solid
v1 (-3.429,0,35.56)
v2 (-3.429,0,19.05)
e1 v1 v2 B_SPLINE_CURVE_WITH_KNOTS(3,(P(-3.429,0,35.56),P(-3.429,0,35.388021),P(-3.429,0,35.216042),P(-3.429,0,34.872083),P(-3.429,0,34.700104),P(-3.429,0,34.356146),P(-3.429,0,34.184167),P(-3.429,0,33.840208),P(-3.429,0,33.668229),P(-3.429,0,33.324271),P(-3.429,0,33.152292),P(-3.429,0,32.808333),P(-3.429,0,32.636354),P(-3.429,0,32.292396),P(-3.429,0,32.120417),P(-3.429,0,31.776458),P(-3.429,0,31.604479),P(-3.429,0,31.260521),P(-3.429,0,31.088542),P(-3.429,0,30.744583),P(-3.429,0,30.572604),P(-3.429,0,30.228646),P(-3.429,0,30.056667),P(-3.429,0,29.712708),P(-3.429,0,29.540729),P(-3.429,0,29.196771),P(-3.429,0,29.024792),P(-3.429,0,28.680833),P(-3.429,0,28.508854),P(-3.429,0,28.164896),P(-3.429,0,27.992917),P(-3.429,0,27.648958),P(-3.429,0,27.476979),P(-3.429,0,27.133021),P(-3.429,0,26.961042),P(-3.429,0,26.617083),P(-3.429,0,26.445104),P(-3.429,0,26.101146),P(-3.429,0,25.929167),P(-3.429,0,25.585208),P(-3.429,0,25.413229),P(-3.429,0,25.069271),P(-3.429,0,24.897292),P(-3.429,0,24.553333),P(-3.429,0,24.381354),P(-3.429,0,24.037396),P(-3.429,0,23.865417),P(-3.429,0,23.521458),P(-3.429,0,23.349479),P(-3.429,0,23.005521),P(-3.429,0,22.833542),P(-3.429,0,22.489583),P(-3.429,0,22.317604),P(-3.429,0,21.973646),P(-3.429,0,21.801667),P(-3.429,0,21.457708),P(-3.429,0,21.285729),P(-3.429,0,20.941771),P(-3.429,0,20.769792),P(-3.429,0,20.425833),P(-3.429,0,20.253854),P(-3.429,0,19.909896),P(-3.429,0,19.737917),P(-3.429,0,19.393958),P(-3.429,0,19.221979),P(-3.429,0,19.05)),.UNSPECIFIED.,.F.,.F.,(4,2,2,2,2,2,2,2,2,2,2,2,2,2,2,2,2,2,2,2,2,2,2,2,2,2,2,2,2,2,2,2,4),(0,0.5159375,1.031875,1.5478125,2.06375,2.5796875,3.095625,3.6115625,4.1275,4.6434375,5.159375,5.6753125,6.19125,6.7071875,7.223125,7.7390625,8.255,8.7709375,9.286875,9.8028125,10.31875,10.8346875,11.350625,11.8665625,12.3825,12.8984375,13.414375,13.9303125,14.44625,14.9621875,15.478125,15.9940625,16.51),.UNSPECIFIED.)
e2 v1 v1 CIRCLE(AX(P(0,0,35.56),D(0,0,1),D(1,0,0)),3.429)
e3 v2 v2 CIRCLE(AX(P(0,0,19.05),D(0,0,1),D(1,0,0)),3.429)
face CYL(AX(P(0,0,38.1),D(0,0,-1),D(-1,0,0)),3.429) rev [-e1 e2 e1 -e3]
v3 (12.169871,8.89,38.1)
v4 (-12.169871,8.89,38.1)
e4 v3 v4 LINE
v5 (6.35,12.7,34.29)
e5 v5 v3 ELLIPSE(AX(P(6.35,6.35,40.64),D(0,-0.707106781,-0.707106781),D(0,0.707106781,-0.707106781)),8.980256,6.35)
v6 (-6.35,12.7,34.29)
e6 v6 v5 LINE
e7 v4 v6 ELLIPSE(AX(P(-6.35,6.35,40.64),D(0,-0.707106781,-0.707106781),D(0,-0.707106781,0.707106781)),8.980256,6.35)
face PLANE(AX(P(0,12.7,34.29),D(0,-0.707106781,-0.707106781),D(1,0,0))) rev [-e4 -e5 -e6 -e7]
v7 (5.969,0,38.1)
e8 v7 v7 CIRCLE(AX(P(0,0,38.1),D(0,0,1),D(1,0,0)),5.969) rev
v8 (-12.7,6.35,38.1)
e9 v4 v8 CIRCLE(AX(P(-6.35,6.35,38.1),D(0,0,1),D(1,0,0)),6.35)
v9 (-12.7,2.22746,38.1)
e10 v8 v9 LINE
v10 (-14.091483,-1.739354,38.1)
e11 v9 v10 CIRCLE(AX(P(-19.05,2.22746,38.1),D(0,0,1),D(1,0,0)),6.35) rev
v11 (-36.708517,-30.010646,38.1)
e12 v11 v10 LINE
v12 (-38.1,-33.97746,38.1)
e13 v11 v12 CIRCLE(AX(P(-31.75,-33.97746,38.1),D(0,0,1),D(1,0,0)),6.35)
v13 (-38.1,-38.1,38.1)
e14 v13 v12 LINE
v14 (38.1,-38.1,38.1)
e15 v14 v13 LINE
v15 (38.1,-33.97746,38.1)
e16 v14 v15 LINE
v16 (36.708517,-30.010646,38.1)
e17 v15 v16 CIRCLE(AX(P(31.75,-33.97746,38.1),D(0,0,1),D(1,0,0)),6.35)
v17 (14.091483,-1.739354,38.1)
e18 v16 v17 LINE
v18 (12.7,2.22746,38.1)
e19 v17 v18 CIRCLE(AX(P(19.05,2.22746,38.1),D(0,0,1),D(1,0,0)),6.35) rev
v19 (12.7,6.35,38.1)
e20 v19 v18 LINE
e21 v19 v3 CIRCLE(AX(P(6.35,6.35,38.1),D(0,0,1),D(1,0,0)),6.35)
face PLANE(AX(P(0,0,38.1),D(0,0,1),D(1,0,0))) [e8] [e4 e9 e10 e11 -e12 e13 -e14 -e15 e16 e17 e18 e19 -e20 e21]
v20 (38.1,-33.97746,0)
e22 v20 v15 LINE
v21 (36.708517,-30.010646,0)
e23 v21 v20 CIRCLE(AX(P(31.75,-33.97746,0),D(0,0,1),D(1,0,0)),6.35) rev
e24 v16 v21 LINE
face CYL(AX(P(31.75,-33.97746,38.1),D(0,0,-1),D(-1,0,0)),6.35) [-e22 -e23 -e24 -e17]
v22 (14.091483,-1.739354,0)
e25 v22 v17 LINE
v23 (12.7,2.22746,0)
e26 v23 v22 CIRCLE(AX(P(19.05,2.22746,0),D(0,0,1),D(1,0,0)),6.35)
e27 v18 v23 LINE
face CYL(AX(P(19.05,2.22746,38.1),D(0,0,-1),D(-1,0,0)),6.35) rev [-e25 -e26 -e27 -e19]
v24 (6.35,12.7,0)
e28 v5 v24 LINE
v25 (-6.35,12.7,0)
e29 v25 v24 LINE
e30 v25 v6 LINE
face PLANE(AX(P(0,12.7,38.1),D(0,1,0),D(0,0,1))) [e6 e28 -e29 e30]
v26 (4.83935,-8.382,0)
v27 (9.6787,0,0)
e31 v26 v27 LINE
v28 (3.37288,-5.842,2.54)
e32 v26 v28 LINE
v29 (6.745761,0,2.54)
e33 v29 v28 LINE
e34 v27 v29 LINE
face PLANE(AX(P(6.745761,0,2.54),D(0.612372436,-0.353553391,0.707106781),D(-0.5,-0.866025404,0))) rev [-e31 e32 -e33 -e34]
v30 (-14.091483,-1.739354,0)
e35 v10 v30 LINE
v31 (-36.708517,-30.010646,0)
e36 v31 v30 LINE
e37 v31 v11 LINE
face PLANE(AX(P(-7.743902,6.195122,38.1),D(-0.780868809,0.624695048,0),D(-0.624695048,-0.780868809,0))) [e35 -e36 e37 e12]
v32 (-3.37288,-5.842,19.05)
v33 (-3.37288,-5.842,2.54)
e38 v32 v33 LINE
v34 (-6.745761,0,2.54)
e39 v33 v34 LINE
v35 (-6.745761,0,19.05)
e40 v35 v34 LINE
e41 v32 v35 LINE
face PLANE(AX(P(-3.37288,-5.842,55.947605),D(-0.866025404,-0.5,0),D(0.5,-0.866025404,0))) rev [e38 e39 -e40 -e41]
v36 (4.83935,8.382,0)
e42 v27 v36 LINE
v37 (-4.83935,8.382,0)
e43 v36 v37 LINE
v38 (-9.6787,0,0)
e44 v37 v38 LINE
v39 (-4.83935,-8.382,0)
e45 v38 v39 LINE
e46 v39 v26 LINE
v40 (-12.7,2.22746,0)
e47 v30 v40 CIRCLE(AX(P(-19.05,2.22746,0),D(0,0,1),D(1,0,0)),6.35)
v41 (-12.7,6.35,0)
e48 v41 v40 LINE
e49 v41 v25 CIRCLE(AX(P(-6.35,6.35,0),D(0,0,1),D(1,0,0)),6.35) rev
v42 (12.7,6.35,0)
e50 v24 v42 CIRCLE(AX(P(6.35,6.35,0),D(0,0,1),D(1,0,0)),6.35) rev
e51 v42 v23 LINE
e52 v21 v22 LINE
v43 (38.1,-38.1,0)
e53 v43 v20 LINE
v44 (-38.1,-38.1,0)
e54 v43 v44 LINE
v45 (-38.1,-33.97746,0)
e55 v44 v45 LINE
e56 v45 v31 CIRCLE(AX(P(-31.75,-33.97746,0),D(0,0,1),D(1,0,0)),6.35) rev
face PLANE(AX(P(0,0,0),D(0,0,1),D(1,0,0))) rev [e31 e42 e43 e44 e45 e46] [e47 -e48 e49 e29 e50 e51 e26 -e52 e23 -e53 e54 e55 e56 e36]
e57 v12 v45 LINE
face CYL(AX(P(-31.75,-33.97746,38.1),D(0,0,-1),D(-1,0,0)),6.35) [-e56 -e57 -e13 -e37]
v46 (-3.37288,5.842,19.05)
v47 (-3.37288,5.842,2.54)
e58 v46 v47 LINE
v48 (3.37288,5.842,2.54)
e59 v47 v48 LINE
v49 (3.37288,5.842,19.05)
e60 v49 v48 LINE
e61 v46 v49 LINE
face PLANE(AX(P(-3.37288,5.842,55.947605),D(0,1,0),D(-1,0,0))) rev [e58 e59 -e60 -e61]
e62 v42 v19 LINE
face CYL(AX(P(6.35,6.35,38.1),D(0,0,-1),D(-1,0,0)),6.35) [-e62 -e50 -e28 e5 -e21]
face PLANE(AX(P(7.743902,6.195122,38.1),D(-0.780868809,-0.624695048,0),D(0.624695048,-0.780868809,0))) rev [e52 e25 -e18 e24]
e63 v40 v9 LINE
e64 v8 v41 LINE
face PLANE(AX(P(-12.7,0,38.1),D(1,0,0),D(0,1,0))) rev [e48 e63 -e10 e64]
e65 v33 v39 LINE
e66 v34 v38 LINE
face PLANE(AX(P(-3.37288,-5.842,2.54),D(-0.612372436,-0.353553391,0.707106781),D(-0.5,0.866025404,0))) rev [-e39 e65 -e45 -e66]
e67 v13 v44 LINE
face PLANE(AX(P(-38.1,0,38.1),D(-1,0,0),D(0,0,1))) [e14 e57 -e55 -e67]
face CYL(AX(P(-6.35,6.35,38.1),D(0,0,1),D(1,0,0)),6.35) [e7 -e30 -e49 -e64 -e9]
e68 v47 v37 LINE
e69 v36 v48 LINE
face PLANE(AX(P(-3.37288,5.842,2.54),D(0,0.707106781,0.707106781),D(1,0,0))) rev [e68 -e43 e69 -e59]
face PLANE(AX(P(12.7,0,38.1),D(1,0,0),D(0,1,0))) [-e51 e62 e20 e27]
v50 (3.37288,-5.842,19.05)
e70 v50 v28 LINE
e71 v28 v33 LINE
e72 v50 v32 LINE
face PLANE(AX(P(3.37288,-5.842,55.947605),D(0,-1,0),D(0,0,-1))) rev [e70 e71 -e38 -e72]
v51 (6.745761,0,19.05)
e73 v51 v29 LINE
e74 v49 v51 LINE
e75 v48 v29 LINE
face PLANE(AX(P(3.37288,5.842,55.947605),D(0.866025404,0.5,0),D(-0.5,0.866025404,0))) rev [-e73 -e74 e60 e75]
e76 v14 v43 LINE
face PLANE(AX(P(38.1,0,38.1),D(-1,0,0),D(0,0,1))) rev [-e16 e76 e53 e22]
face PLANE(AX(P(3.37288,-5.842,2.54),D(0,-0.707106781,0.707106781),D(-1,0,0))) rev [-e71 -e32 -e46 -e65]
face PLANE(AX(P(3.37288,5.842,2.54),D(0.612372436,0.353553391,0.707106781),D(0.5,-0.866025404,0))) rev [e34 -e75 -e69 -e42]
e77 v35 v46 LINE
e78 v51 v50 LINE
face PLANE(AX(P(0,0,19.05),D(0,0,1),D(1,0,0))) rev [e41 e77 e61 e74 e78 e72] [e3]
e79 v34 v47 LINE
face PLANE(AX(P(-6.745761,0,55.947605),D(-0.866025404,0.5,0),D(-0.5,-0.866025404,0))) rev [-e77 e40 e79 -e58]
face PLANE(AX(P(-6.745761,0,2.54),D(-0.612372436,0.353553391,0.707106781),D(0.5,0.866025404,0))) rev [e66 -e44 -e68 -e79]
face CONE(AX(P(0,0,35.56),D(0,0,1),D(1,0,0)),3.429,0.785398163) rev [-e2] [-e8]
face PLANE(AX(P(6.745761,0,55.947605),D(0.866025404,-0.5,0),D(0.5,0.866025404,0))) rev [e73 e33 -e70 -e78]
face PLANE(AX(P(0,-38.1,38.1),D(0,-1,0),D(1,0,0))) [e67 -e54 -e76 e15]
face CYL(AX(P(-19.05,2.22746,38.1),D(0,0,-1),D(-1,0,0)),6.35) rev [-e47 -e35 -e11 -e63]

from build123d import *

# Parameters (mm, degrees)
BOSS_EXTRUDE1_DEPTH = 38.1
CUT_EXTRUDE1_DEPTH  = 19.05
CHAMFER1_SIZE       = 2.54
CHAMFER2_SIZE       = 2.54
FILLET1_R           = 6.35
CHAMFER3_SIZE       = 3.81


with BuildPart() as part:
    # Sketch1 → Boss-Extrude1 (new body)
    with BuildSketch(Plane.XY):
        with BuildLine():
            Line((0, 3.429), (0, 12.7))
            Line((0, 12.7), (-12.7, 12.7))
            Line((-12.7, 12.7), (-12.7, 0))
            Line((-12.7, 0), (-38.1, -31.75))
            Line((-38.1, -31.75), (-38.1, -38.1))
            Line((-38.1, -38.1), (0, -38.1))
            Line((0, -38.1), (0, -3.429))
            ThreePointArc((0, -3.429), (-3.429, 0), (0, 3.429))
        make_face()
        with BuildLine():
            Line((12.7, 12.7), (0, 12.7))
            Line((0, 12.7), (0, 3.429))
            ThreePointArc((0, 3.429), (2.424669153, 2.424669153), (3.429, 0))
            ThreePointArc((3.429, 0), (2.424669153, -2.424669153), (0, -3.429))
            Line((0, -3.429), (0, -38.1))
            Line((0, -38.1), (38.1, -38.1))
            Line((38.1, -38.1), (38.1, -31.75))
            Line((38.1, -31.75), (12.7, 0))
            Line((12.7, 0), (12.7, 12.7))
        make_face()
    extrude(amount=BOSS_EXTRUDE1_DEPTH)

    # Sketch2 → Cut-Extrude1 (cut)
    with BuildSketch(Plane(origin=(0, 0, 0), x_dir=(-1, 0, 0), z_dir=(0, 0, -1))):
        Polygon((6.745760545, 0), (3.372880273, 5.842), (-3.372880273, 5.842), (-6.745760545, 0), (-3.372880273, -5.842), (3.372880273, -5.842), align=None)
    extrude(amount=-CUT_EXTRUDE1_DEPTH, mode=Mode.SUBTRACT)

    # Chamfer1
    chamfer1_edges = [part.edges().sort_by_distance(p)[0] for p in [
        (-5.059320409, -2.921, 0),
        (-5.059320409, 2.921, 0),
        (0, 5.842, 0),
        (5.059320409, 2.921, 0),
        (5.059320409, -2.921, 0),
        (0, -5.842, 0),
    ]]
    chamfer(chamfer1_edges, length=CHAMFER1_SIZE)

    # Chamfer2
    chamfer2_edges = [part.edges().sort_by_distance(p)[0] for p in [
        (0, 3.429, 38.1),
    ]]
    chamfer(chamfer2_edges, length=CHAMFER2_SIZE)

    # Fillet1
    fillet1_edges = [part.edges().sort_by_distance(p)[0] for p in [
        (12.7, 0, 19.05),
        (38.1, -31.75, 19.05),
        (-38.1, -31.75, 19.05),
        (-12.7, 0, 19.05),
        (-12.7, 12.7, 19.05),
        (12.7, 12.7, 19.05),
    ]]
    fillet(fillet1_edges, radius=FILLET1_R)

    # Chamfer3
    # the kernel refuses this chamfer: 3.81 mm, written as the material it takes off along each edge
    with BuildSketch(Plane(origin=(-16.148112184, 12.7, 38.1), x_dir=(0, -0.9996219169112968, 0.027495876610586386), z_dir=(1, 0, 0))) as chamfer3_piece_1:
        Polygon((CHAMFER3_SIZE * 0.999621916911, CHAMFER3_SIZE * 0.0274958766106), (-CHAMFER3_SIZE * 0.0274958766106, CHAMFER3_SIZE * 0.999621916911), (0, 0), align=None)
    extrude(amount=32.296224368, mode=Mode.SUBTRACT)


solid = part.part
